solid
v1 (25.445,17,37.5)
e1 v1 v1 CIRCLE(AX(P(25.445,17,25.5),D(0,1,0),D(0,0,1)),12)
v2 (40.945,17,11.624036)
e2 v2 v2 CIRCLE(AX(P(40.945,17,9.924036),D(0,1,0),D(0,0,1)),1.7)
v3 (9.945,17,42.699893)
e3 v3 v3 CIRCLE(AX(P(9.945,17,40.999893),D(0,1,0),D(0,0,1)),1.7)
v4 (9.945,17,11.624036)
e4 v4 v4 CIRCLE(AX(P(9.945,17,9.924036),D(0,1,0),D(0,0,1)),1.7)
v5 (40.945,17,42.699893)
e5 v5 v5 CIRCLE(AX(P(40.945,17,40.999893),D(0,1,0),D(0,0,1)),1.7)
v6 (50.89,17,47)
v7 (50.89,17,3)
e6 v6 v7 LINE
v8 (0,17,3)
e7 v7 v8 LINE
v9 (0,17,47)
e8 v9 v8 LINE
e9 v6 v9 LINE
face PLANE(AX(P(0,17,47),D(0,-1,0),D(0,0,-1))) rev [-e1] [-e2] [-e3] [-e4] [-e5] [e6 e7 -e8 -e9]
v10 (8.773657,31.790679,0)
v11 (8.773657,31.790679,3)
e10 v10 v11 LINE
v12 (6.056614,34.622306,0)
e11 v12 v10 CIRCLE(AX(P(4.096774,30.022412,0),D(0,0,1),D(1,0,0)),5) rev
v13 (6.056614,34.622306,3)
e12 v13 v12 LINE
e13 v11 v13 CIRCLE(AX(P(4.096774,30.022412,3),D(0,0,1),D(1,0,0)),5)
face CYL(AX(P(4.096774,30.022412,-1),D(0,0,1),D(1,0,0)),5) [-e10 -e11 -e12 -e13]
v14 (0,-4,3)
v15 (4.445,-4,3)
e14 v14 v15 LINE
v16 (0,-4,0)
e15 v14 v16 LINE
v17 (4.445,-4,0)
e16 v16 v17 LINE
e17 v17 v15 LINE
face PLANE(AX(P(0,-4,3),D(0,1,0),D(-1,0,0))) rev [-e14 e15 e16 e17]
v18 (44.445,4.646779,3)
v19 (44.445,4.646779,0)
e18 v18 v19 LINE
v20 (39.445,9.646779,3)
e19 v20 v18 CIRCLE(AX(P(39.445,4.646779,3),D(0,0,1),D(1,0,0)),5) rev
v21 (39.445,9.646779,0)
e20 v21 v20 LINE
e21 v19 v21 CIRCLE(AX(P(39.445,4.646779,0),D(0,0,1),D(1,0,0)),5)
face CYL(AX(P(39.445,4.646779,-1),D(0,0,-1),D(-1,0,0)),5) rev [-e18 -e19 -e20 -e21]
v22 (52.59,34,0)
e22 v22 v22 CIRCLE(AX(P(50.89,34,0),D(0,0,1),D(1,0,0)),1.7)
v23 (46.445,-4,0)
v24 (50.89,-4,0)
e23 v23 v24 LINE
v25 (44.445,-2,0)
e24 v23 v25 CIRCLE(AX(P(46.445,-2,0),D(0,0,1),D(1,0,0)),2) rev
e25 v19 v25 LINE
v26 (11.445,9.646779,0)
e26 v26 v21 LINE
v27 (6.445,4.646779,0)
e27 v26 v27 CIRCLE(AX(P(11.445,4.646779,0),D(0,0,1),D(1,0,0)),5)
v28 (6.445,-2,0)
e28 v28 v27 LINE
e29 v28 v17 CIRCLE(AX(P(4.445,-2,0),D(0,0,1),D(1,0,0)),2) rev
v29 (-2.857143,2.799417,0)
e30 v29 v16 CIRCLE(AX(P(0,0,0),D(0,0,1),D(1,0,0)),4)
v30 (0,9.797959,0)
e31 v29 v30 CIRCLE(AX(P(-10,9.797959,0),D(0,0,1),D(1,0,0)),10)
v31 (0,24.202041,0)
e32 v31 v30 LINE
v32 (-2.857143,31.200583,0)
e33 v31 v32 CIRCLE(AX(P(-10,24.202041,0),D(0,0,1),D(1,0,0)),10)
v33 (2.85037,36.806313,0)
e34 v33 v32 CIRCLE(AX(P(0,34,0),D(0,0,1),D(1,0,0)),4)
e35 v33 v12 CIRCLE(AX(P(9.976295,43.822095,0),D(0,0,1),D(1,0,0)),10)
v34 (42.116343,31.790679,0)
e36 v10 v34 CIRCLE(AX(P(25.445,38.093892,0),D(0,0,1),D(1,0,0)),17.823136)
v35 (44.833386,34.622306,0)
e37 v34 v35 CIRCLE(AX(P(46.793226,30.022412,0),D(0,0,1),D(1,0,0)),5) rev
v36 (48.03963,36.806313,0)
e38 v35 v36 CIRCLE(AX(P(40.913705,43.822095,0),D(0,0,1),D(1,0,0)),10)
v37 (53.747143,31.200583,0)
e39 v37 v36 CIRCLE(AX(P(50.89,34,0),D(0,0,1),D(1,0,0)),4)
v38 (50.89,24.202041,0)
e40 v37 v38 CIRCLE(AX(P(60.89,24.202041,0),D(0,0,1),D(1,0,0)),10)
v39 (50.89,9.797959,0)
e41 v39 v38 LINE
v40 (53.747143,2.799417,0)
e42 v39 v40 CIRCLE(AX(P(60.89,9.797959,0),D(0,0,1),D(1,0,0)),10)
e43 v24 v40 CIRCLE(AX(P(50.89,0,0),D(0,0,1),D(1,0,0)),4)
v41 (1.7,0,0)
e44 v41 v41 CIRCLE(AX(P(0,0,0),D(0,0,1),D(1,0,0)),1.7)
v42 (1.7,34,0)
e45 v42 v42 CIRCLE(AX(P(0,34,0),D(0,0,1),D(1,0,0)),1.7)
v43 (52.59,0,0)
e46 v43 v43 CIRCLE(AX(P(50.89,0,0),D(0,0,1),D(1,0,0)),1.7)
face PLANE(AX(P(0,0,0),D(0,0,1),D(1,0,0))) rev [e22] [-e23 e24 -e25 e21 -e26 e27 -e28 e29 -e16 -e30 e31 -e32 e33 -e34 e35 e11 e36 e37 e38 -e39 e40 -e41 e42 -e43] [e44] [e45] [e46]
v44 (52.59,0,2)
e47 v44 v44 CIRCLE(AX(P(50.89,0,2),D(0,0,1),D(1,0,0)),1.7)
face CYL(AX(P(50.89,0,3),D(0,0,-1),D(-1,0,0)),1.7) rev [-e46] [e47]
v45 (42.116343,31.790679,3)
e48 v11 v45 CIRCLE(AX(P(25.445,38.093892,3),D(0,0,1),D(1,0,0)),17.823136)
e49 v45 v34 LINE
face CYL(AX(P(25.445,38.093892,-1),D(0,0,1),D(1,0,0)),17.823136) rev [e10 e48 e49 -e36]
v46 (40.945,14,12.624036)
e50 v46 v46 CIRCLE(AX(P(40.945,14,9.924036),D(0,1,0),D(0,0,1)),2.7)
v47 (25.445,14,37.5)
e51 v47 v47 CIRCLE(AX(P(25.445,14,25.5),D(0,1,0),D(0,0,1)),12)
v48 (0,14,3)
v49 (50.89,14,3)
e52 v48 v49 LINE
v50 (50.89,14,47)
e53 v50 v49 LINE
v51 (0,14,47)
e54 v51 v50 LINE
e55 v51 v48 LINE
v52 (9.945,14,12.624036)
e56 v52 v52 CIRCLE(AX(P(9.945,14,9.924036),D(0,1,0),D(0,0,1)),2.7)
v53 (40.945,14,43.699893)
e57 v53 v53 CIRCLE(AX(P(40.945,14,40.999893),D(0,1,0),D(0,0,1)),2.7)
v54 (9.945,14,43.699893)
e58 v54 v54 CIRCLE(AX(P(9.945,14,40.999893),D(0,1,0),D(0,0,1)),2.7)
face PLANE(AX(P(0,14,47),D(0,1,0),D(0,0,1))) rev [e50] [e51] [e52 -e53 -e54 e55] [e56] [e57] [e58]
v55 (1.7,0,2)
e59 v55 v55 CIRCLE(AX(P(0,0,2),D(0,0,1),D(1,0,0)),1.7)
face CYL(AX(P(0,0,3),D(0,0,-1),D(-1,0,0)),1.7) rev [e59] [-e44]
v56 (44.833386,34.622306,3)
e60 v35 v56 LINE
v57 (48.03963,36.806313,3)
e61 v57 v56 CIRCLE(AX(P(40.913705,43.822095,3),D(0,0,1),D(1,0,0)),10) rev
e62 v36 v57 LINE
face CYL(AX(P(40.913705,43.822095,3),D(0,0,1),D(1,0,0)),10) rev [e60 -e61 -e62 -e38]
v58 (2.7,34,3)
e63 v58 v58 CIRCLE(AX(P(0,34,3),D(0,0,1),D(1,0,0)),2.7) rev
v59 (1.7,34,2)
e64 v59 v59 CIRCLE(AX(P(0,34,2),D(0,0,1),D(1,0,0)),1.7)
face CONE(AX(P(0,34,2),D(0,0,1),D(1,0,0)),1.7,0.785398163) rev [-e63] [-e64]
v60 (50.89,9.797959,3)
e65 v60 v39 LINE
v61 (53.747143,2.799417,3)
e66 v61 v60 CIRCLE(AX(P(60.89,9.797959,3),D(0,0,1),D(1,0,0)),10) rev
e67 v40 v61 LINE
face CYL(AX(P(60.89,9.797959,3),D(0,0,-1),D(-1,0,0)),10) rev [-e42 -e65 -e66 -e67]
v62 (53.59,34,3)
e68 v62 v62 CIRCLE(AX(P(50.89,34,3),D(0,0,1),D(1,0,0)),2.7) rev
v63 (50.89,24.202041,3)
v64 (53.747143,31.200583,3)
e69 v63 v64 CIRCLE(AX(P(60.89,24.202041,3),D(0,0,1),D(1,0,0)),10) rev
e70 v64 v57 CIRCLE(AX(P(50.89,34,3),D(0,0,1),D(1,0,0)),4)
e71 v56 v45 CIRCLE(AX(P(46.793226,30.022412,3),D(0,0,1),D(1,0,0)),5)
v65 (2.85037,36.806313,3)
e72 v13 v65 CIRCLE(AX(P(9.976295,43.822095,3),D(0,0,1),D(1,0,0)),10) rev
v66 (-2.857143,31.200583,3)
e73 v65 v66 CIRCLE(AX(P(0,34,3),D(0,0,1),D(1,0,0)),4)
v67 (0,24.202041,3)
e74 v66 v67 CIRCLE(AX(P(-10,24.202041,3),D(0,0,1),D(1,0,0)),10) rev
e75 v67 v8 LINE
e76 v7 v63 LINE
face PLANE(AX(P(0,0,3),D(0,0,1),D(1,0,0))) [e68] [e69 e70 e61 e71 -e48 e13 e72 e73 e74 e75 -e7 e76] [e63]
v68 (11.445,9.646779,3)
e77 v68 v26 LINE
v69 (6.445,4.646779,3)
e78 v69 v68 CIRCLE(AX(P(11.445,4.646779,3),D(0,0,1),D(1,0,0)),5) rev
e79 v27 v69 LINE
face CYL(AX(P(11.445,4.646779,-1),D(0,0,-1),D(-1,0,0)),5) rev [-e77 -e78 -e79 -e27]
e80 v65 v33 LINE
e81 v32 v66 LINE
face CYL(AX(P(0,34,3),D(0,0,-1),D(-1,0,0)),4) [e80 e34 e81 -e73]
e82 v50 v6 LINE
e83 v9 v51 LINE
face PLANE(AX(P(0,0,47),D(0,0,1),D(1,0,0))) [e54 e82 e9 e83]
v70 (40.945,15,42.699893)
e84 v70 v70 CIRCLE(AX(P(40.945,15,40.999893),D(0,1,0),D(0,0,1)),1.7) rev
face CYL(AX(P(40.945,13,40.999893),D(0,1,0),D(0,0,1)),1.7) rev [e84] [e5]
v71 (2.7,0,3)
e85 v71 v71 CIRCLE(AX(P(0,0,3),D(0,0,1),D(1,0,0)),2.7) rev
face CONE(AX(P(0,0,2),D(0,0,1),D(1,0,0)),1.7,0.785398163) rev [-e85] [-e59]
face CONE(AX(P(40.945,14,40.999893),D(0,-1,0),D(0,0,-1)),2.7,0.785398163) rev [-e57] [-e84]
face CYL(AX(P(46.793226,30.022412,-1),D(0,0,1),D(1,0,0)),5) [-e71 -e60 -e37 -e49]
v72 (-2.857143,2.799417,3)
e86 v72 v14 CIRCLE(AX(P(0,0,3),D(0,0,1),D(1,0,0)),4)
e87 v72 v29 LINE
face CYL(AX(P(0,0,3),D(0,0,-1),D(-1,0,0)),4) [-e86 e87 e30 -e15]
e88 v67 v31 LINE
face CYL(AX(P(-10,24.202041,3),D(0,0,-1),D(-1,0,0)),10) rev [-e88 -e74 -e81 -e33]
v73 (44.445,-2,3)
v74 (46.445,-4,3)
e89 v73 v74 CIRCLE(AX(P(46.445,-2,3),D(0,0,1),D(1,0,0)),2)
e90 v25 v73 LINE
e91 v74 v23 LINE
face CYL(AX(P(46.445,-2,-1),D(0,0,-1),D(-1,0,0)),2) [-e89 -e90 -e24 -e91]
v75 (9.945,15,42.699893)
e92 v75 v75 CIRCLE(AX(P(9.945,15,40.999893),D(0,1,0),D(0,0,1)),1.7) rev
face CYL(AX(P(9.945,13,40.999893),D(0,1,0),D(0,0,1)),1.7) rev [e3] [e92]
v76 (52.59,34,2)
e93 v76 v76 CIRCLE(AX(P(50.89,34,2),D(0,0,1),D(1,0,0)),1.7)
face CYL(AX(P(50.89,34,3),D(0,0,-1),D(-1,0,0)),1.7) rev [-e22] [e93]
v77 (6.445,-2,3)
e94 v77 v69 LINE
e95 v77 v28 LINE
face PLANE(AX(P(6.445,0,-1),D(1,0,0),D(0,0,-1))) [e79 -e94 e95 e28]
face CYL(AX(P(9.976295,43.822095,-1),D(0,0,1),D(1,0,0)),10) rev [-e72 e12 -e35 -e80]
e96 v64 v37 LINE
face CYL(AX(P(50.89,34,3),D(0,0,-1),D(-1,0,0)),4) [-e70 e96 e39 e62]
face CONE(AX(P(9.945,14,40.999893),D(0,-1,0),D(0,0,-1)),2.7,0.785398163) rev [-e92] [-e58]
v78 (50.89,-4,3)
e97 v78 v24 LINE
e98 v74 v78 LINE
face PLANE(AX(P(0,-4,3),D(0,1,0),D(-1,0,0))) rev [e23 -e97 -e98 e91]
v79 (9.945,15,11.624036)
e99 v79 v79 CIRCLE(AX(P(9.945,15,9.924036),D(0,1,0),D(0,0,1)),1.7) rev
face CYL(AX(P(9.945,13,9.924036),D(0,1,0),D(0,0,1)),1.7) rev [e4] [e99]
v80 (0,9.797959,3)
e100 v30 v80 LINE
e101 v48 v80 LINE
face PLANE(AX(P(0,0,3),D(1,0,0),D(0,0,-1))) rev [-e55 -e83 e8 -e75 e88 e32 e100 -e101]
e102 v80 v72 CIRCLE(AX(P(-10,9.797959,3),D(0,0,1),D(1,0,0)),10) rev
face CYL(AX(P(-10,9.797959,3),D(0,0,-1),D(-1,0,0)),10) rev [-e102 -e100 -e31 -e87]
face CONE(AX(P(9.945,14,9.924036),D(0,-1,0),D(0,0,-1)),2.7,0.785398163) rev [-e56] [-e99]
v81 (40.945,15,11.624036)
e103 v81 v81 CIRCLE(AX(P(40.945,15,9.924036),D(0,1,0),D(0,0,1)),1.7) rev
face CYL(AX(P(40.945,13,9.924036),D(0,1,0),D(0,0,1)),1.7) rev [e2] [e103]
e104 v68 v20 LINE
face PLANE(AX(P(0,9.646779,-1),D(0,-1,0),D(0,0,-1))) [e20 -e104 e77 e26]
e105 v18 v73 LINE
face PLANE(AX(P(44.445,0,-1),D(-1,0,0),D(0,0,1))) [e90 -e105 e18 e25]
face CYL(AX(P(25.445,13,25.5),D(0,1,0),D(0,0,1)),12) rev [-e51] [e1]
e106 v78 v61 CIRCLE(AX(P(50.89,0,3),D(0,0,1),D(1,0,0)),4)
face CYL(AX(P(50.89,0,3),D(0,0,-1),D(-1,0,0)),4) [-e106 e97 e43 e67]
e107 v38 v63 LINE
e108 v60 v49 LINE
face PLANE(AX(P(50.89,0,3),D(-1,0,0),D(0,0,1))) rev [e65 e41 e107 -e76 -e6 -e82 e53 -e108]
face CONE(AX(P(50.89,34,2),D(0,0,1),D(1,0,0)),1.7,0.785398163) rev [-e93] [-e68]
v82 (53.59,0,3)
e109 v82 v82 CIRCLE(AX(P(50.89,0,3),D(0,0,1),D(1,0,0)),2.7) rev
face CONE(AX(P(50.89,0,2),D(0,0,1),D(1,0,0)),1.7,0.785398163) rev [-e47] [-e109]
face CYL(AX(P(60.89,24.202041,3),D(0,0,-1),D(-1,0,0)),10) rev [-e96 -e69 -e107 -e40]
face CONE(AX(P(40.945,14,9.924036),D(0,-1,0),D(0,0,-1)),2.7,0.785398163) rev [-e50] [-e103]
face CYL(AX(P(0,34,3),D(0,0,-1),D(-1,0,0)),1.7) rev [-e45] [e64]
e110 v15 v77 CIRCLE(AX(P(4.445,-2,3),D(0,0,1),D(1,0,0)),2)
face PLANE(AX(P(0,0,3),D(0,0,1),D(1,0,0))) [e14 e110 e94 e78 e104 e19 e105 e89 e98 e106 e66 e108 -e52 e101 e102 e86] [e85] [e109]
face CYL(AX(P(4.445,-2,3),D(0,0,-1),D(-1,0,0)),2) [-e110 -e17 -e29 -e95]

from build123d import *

# Parameters (mm, degrees)
SKETCH_1_R          = 1.7
EXTRUDE_1_DEPTH     = 3
EXTRUDE_2_DEPTH     = 44
SKETCH_3_R          = 1.7
SKETCH_3_R_2        = 12
CUT_EXTRUDE_1_DEPTH = 4
SKETCH_4_W          = 38
SKETCH_4_H          = 9.646779348
SKETCH_4_H_2        = 4
CUT_EXTRUDE_2_DEPTH = 4
FILLET_1_R          = 10
CHAMFER_1_SIZE      = 1
CHAMFER_2_SIZE      = 1
FILLET_4_R          = 5
FILLET_5_R          = 2
FILLET_6_R          = 5


with BuildPart() as part:
    # Эскиз1 → Бобышка-Вытянуть1 (new body)
    with BuildSketch(Plane.XY):
        with BuildLine():
            ThreePointArc((0, 4), (-4, 0), (0, -4))
            Line((0, -4), (50.89, -4))
            ThreePointArc((50.89, -4), (54.89, 0), (50.89, 4))
            Line((50.89, 4), (50.89, 30))
            ThreePointArc((50.89, 30), (53.718427125, 36.828427125), (46.89, 34))
            Line((46.89, 34), (4, 34))
            ThreePointArc((4, 34), (-2.828427125, 36.828427125), (0, 30))
            Line((0, 30), (0, 4))
        make_face()
        with Locations((50.89, 34)):
            Circle(SKETCH_1_R, mode=Mode.SUBTRACT)
        Circle(SKETCH_1_R, mode=Mode.SUBTRACT)
        with Locations((50.89, 0)):
            Circle(SKETCH_1_R, mode=Mode.SUBTRACT)
        with Locations((0, 34)):
            Circle(SKETCH_1_R, mode=Mode.SUBTRACT)
    extrude(amount=EXTRUDE_1_DEPTH)

    # Эскиз2 → Бобышка-Вытянуть2 (add)
    with BuildSketch(Plane.XY.offset(3)):
        Polygon((50.89, 17), (28.893119951, 17), (0, 17), (0, 14), (50.89, 14), align=None)
    extrude(amount=EXTRUDE_2_DEPTH)

    # Эскиз3 → Вырез-Вытянуть1 (cut)
    with BuildSketch(Plane(origin=(0, 17, 0), x_dir=(1, 0, 0), z_dir=(0, 1, 0))):
        with Locations(Location((9.945, -40.999892664, 0), (0, 0, 270))):
            Circle(SKETCH_3_R)
        with Locations(Location((25.445, -25.5, 0), (0, 0, 270))):
            Circle(SKETCH_3_R_2)
        with Locations(Location((9.945, -9.924036406, 0), (0, 0, 270))):
            Circle(SKETCH_3_R)
        with Locations(Location((40.945, -9.924036406, 0), (0, 0, 270))):
            Circle(SKETCH_3_R)
        with Locations(Location((40.945, -40.999892664, 0), (0, 0, 270))):
            Circle(SKETCH_3_R)
    extrude(amount=-CUT_EXTRUDE_1_DEPTH, mode=Mode.SUBTRACT)

    # Эскиз4 → Вырез-Вытянуть2 (cut)
    with BuildSketch(Plane.XY.offset(3)):
        with BuildLine():
            Line((25.445, 34), (10.58125454, 34))
            Line((10.58125454, 34), (8.098408954, 34))
            ThreePointArc((8.098408954, 34), (25.445, 20.270756407), (42.791591046, 34))
            Line((42.791591046, 34), (25.445, 34))
        make_face()
        with Locations((25.445, 4.823389674)):
            Rectangle(SKETCH_4_W, SKETCH_4_H)
        with Locations((25.445, -2)):
            Rectangle(SKETCH_4_W, SKETCH_4_H_2)
    extrude(amount=-CUT_EXTRUDE_2_DEPTH, mode=Mode.SUBTRACT)

    # Скругление1
    # the kernel refuses this fillet: 10 mm, written as the material it adds along each edge
    with BuildSketch(Plane(origin=(0, 30, 0), x_dir=(0, -1, 0), z_dir=(0, 0, 1)), Plane(origin=(50.89, 4, 0), x_dir=(0, 1, 0), z_dir=(0, 0, 1))) as fillet_1_piece_1:
        with BuildLine():
            CenterArc((5.797958971, -10), FILLET_1_R, 90, 44.415308597)
            Line((-1.200583151, -2.857142857), (-1.340553994, -2.714285714))
            ThreePointArc((-1.340553994, -2.714285714), (-0.496723332, -1.472091229), (-0.2, 0))
            Line((-0.2, 0), (0, 0.2))
            Line((0, 0.2), (5.797958971, 0.2))
            Line((5.797958971, 0.2), (5.797958971, 0))
        make_face()
    extrude(amount=3)
    with BuildSketch(Plane(origin=(0, 4, 0), x_dir=(-0.9219149126204018, -0.387392428795552, 0), z_dir=(0, 0, 1)), Plane(origin=(50.89, 30, 0), x_dir=(0.9219149126204016, 0.38739242879555247, 0), z_dir=(0, 0, 1))) as fillet_1_piece_2:
        with BuildLine():
            CenterArc((6.973063718, -9.219149126), FILLET_1_R, 112.792345701, 44.415308597)
            Line((-2.246085408, -5.345224838), (-2.43046839, -5.267746352))
            Line((-2.43046839, -5.267746352), (-0.184382983, 0.077478486))
            Line((-0.184382983, 0.077478486), (0.077478486, 0.184382983))
            ThreePointArc((0.077478486, 0.184382983), (1.549569715, -0.11234035), (3.021660945, 0.184382983))
            Line((3.021660945, 0.184382983), (3.09913943, 0))
        make_face()
    extrude(amount=3)
    with BuildSketch(Plane(origin=(46.89, 34, 0), x_dir=(0.3790827918383792, 0.9253627596418714, 0), z_dir=(0, 0, 1))) as fillet_1_piece_3:
        with BuildLine():
            CenterArc((6.823490253, 9.253627596), FILLET_1_R, 213.100635844, 34.622483912)
            Line((-1.553636308, 3.79251502), (-1.72117884, 3.683292769))
            ThreePointArc((-1.72117884, 3.683292769), (-0.961890706, 1.820440952), (-0.185072552, -0.075816558))
            Line((-0.185072552, -0.075816558), (0.075816558, -0.185072552))
            ThreePointArc((0.075816558, -0.185072552), (1.516331167, 0.098548961), (2.956845776, -0.185072552))
            Line((2.956845776, -0.185072552), (3.032662335, 0))
        make_face()
    extrude(amount=3)
    with BuildSketch(Plane(origin=(4, 34, 0), x_dir=(-0.3790827918383573, 0.9253627596418805, 0), z_dir=(0, 0, 1))) as fillet_1_piece_4:
        with BuildLine():
            CenterArc((6.823490253, -9.253627596), FILLET_1_R, 112.276880243, 34.622483912)
            Line((-1.553636308, -3.79251502), (-1.72117884, -3.683292769))
            ThreePointArc((-1.72117884, -3.683292769), (-0.961890706, -1.820440952), (-0.185072552, 0.075816558))
            Line((-0.185072552, 0.075816558), (0.075816558, 0.185072552))
            ThreePointArc((0.075816558, 0.185072552), (1.516331167, -0.098548961), (2.956845776, 0.185072552))
            Line((2.956845776, 0.185072552), (3.032662335, 0))
        make_face()
    extrude(amount=3)

    # Фаска1
    chamfer_1_edges = [part.edges().sort_by_distance(p)[0] for p in [
        (40.945, 14, 8.224036406),
        (40.945, 14, 39.299892664),
        (9.945, 14, 39.299892664),
        (9.945, 14, 8.224036406),
    ]]
    chamfer(chamfer_1_edges, length=CHAMFER_1_SIZE)

    # Фаска2
    chamfer_2_edges = [part.edges().sort_by_distance(p)[0] for p in [
        (49.19, 34, 3),
        (-1.7, 0, 3),
        (49.19, 0, 3),
        (-1.7, 34, 3),
    ]]
    chamfer(chamfer_2_edges, length=CHAMFER_2_SIZE)

    # Скругление4
    fillet_4_edges = [part.edges().sort_by_distance(p)[0] for p in [
        (6.445, 9.646779348, 1.5),
        (44.445, 9.646779348, 1.5),
    ]]
    fillet(fillet_4_edges, radius=FILLET_4_R)

    # Скругление5
    fillet_5_edges = [part.edges().sort_by_distance(p)[0] for p in [
        (6.445, -4, 1.5),
        (44.445, -4, 1.5),
    ]]
    fillet(fillet_5_edges, radius=FILLET_5_R)

    # Скругление6
    fillet_6_edges = [part.edges().sort_by_distance(p)[0] for p in [
        (8.098408954, 34, 1.5),
        (42.791591046, 34, 1.5),
    ]]
    fillet(fillet_6_edges, radius=FILLET_6_R)


solid = part.part
